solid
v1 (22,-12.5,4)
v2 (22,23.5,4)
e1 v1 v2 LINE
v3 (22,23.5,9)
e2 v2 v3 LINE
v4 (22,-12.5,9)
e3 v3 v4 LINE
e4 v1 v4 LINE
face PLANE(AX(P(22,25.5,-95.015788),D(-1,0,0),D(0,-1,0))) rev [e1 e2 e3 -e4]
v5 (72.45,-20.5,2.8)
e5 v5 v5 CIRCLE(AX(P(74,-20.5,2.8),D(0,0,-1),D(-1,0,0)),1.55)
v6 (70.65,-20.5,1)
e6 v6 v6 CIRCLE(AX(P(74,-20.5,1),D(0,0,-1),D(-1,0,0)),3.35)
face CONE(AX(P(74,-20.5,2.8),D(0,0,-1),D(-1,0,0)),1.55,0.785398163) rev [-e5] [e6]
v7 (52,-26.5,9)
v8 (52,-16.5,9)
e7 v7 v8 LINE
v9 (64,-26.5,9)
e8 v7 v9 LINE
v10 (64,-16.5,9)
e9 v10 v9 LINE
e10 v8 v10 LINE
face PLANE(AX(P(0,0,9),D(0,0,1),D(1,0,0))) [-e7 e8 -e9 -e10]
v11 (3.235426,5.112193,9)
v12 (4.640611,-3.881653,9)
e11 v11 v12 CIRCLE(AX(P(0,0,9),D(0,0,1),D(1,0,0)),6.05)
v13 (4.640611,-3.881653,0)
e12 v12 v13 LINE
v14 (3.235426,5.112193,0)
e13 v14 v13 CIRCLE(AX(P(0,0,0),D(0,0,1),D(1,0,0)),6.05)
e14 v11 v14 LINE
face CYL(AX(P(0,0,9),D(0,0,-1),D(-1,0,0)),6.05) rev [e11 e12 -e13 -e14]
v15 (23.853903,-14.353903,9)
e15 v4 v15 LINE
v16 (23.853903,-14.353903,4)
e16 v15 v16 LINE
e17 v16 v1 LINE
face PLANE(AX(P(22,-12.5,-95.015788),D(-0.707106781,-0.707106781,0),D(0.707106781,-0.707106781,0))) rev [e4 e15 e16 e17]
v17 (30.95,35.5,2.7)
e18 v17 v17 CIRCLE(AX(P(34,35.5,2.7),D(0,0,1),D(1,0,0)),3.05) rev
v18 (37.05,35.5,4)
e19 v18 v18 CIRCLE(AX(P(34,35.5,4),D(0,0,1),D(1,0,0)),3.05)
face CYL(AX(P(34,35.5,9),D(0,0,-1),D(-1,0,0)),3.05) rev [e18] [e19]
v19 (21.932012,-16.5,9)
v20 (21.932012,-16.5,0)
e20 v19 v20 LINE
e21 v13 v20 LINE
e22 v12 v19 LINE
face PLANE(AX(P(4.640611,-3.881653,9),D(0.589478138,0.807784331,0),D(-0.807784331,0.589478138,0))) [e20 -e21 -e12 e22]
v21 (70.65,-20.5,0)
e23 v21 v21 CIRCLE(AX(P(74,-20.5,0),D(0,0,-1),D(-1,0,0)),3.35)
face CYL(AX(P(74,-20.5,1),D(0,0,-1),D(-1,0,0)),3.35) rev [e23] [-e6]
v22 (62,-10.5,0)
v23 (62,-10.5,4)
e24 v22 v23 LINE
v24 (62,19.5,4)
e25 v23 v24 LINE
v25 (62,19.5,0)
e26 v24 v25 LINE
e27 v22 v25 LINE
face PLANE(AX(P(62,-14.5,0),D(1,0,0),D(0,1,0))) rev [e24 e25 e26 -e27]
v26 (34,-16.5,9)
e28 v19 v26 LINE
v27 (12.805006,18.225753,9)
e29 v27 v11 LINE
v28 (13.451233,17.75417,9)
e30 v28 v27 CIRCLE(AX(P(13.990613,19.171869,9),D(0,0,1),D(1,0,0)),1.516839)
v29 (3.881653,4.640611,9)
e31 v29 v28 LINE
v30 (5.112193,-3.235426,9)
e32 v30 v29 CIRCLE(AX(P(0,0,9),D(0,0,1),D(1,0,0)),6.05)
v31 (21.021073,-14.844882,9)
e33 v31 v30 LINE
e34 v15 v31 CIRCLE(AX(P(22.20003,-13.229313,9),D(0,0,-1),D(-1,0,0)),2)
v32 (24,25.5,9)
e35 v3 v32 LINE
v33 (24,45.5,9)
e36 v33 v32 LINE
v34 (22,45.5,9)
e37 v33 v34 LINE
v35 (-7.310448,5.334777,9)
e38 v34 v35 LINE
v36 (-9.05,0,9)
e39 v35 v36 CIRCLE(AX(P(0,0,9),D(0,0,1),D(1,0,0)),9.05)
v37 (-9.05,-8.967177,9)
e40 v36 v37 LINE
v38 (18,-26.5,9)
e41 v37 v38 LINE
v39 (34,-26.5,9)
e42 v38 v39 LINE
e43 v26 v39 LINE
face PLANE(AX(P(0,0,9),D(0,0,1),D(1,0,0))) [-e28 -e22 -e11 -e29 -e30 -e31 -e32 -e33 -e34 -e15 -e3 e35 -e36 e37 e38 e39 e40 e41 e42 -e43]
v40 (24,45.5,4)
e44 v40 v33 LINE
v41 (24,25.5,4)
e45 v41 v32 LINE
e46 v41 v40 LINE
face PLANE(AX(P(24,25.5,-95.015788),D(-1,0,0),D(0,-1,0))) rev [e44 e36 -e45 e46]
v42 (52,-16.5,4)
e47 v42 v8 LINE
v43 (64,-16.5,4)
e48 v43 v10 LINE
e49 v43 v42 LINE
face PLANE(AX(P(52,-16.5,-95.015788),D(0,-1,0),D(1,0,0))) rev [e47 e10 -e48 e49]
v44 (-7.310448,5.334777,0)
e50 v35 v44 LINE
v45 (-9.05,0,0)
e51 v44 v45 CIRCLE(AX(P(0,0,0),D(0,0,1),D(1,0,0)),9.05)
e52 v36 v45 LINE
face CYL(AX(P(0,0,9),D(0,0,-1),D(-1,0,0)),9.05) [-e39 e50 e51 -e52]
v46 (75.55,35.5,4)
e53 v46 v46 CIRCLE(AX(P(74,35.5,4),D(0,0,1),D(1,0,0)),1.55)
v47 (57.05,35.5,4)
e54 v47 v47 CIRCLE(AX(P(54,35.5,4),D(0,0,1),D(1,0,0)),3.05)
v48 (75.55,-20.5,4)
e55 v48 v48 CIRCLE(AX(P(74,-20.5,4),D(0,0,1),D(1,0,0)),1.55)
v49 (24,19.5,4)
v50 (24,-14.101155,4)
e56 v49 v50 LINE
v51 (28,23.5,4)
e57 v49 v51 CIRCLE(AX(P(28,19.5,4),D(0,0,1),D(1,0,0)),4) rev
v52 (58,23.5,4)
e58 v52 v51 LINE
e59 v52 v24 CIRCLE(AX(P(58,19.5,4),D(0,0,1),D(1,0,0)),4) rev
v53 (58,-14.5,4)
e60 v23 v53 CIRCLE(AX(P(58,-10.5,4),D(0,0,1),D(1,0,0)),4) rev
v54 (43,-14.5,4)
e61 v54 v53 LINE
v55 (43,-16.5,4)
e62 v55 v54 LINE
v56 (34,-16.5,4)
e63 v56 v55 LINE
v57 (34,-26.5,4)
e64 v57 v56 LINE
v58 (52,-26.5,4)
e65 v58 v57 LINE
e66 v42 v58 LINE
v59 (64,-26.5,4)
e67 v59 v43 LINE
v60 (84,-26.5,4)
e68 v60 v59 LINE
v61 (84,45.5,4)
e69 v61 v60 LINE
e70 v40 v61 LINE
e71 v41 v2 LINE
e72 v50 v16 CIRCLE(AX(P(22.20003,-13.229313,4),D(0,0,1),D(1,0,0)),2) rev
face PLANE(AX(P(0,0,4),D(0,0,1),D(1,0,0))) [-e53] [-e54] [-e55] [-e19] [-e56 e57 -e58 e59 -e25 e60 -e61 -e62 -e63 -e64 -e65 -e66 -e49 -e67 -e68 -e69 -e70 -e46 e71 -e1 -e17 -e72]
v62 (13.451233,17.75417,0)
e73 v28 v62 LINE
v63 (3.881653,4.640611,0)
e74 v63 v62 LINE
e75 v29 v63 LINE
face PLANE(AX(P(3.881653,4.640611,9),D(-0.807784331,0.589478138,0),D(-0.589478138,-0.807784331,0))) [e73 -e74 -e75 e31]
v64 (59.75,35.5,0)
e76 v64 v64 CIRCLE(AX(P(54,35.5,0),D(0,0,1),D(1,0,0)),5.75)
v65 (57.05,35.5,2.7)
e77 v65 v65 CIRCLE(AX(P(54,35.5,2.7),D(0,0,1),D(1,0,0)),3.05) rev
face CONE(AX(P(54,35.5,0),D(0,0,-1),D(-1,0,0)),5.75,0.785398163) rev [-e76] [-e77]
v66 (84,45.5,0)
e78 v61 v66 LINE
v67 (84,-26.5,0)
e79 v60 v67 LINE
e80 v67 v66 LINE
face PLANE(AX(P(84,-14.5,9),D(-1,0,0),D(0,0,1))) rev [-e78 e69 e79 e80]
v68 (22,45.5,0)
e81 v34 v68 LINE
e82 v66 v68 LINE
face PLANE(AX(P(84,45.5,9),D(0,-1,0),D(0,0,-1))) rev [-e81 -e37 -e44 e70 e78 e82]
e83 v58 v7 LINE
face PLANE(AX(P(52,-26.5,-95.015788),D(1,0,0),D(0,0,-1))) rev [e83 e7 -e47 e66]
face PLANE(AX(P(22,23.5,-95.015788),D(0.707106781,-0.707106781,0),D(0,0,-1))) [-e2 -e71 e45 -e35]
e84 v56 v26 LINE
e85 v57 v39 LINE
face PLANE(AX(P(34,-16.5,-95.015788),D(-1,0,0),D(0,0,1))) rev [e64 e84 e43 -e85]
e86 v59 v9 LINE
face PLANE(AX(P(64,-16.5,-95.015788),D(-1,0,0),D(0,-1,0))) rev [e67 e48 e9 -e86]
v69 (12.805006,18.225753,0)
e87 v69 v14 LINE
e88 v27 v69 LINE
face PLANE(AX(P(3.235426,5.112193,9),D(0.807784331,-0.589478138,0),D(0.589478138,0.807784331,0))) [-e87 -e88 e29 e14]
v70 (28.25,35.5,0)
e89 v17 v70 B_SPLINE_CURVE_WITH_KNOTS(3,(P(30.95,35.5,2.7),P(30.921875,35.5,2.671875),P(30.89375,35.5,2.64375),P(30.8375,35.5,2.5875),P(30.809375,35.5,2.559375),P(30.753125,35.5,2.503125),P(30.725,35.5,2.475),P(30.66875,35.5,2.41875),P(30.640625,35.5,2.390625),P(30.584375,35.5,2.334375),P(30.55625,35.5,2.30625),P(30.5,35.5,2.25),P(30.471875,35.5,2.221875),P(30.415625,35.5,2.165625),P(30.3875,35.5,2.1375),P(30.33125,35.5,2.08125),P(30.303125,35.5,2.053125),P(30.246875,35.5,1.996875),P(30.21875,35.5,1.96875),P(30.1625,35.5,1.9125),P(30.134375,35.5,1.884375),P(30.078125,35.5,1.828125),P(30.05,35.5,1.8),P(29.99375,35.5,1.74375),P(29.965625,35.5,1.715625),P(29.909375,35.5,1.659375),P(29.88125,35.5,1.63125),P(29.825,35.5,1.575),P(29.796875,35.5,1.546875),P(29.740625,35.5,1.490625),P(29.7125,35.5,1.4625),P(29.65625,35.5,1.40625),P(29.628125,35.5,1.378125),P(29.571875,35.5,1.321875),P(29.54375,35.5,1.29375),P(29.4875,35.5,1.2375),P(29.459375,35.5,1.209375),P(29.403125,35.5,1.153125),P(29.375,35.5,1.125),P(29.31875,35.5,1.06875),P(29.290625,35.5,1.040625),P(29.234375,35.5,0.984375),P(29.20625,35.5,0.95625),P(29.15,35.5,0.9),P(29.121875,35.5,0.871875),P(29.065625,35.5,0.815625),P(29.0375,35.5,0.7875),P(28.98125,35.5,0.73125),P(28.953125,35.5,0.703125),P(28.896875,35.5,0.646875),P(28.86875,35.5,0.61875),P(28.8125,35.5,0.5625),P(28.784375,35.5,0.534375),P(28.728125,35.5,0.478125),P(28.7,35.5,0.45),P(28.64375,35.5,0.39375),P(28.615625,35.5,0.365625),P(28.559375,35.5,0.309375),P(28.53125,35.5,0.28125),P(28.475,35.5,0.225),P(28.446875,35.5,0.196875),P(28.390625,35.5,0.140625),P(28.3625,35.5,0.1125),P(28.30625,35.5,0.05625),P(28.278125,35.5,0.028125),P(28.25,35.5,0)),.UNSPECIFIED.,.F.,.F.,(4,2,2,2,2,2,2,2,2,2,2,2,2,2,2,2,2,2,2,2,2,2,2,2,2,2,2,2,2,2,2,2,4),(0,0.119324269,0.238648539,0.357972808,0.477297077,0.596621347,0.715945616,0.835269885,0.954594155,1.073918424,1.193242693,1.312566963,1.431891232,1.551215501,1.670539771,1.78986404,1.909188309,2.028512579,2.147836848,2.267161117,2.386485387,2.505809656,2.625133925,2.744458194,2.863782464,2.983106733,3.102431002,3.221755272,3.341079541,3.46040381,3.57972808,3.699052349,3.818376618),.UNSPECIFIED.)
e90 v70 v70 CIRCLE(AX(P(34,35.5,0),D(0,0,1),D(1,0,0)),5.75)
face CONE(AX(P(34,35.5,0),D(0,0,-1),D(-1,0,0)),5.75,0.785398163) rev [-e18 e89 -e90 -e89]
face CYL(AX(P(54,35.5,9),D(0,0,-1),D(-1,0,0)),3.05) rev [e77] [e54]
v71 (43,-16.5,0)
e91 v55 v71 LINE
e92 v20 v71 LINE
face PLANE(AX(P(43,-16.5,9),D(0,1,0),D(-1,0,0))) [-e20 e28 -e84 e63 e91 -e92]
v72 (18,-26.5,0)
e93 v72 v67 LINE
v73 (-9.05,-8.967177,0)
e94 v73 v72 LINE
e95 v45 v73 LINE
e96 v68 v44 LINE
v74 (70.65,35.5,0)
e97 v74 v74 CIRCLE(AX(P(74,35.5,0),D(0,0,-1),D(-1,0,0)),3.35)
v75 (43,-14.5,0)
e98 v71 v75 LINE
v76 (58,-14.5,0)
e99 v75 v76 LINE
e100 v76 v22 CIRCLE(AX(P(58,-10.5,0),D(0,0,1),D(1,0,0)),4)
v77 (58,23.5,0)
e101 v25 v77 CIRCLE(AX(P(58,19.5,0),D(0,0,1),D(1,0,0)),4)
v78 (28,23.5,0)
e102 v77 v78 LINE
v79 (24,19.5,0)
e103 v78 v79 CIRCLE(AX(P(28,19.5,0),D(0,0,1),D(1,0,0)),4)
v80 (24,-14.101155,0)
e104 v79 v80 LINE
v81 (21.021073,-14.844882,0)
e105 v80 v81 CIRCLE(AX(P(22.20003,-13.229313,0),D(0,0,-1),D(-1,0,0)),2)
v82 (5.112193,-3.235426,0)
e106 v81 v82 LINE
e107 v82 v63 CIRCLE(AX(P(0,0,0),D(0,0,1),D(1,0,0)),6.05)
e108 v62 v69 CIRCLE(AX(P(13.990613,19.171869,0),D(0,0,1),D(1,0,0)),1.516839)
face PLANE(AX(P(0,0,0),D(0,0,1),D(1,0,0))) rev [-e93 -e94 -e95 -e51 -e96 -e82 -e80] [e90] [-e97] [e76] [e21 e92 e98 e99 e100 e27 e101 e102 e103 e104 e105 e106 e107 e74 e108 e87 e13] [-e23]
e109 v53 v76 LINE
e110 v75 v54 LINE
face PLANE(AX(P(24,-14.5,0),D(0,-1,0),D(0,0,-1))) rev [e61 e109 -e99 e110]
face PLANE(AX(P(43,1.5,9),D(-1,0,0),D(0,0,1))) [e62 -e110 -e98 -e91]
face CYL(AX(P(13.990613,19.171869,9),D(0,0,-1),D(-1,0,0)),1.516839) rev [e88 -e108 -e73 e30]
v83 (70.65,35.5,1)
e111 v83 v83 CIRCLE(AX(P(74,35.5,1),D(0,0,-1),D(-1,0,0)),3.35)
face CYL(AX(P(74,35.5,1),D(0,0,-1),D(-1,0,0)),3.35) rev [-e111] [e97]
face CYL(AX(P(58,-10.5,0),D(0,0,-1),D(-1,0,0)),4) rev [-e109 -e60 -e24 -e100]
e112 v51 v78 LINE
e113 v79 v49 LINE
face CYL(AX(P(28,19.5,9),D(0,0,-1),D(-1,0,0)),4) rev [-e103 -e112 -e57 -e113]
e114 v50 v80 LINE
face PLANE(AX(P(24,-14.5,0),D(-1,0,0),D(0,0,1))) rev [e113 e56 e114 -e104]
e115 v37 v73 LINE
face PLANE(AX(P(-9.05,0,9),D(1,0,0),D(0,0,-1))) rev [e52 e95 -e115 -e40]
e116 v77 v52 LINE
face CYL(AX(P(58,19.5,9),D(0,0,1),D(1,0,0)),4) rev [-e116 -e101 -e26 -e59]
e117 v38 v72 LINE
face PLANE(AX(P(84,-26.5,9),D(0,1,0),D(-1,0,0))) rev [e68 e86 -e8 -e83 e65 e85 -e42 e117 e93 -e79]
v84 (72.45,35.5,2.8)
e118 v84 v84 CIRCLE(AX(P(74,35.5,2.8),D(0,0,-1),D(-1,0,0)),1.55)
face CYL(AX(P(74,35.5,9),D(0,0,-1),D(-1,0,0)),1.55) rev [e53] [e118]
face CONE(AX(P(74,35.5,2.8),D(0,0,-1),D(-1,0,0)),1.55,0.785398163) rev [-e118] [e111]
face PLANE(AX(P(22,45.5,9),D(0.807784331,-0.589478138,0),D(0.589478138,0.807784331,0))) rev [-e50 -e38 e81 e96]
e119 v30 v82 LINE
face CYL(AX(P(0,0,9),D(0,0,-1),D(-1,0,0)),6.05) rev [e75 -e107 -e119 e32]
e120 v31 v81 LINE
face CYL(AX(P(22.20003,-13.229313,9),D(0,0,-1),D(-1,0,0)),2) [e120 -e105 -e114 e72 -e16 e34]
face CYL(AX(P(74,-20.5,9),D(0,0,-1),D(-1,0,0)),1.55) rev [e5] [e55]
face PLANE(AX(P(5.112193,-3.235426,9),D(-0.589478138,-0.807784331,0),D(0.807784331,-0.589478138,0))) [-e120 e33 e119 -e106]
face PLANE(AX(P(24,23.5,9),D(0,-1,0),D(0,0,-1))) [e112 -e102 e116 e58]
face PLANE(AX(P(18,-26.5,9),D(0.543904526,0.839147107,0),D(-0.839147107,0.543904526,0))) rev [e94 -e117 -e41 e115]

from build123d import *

# Parameters (mm, degrees)
SKETCH1_R           = 3.05
SKETCH1_R_2         = 1.55
BOSS_EXTRUDE1_DEPTH = 9
CUT_EXTRUDE1_DEPTH  = 5
CHAMFER2_SIZE       = 2.7
SKETCH3_W           = 38
SKETCH3_H           = 38
CUT_EXTRUDE2_DEPTH  = 96.66216598
FILLET1_R           = 4
CHAMFER3_SIZE       = 2
SKETCH4_R           = 3.35
CUT_EXTRUDE3_DEPTH  = 1
CHAMFER4_SIZE       = 1.8


with BuildPart() as part:
    # Sketch1 → Boss-Extrude1 (new body)
    with BuildSketch(Plane.XY):
        with BuildLine():
            Line((84, 45.5), (84, 24))
            Line((84, 24), (84, -14.5))
            Line((84, -14.5), (84, -26.5))
            Line((84, -26.5), (18, -26.5))
            Line((18, -26.5), (-9.05, -8.967177323))
            Line((-9.05, -8.967177323), (-9.05, 0))
            ThreePointArc((-9.05, 0), (-8.604128548, 2.805614358), (-7.310448193, 5.334777148))
            Line((-7.310448193, 5.334777148), (22, 45.5))
            Line((22, 45.5), (84, 45.5))
        make_face()
        with Locations((34, 35.5)):
            Circle(SKETCH1_R, mode=Mode.SUBTRACT)
        with Locations((54, 35.5)):
            Circle(SKETCH1_R, mode=Mode.SUBTRACT)
        with Locations((74, 35.5)):
            Circle(SKETCH1_R_2, mode=Mode.SUBTRACT)
        with Locations((74, -20.5)):
            Circle(SKETCH1_R_2, mode=Mode.SUBTRACT)
        with BuildLine():
            Line((43, 23.5), (43, 7.5))
            ThreePointArc((43, 7.5), (46, 4.5), (43, 1.5))
            Line((43, 1.5), (43, -16.5))
            Line((43, -16.5), (21.932011766, -16.5))
            Line((21.932011766, -16.5), (4.640610801, -3.881653178))
            ThreePointArc((4.640610801, -3.881653178), (-5.977483288, -0.933913025), (3.235425713, 5.112193312))
            Line((3.235425713, 5.112193312), (12.805005626, 18.22575293))
            ThreePointArc((12.805005626, 18.22575293), (14.884756486, 20.397148397), (13.451233091, 17.75417042))
            Line((13.451233091, 17.75417042), (3.881653178, 4.640610801))
            ThreePointArc((3.881653178, 4.640610801), (5.977483288, 0.933913025), (5.112193312, -3.235425713))
            Line((5.112193312, -3.235425713), (21.021073392, -14.84488216))
            ThreePointArc((21.021073392, -14.84488216), (23.110996656, -15.009801956), (24.2, -13.218419945))
            Line((24.2, -13.218419945), (24, 23.5))
            Line((24, 23.5), (43, 23.5))
        make_face(mode=Mode.SUBTRACT)
    extrude(amount=BOSS_EXTRUDE1_DEPTH)

    # Sketch2 → Cut-Extrude1 (cut)
    with BuildSketch(Plane.XY.offset(9)):
        Polygon((24, 25.5), (22, 25.5), (22, -12.5), (26, -16.5), (34, -16.5), (34, -26.5), (52, -26.5), (52, -16.5), (64, -16.5), (64, -26.5), (84, -26.5), (84, 45.5), (24, 45.5), align=None)
    extrude(amount=-CUT_EXTRUDE1_DEPTH, mode=Mode.SUBTRACT)

    # Chamfer2
    chamfer2_edges = [part.edges().sort_by_distance(p)[0] for p in [
        (30.95, 35.5, 0),
        (50.95, 35.5, 0),
    ]]
    chamfer(chamfer2_edges, length=CHAMFER2_SIZE)

    # Sketch3 → Cut-Extrude2 (cut, through all)
    with BuildSketch(Plane.XY.offset(4)):
        with Locations((43, 4.5)):
            Rectangle(SKETCH3_W, SKETCH3_H)
    extrude(amount=-CUT_EXTRUDE2_DEPTH, mode=Mode.SUBTRACT)

    # Fillet1
    fillet1_edges = [part.edges().sort_by_distance(p)[0] for p in [
        (62, 23.5, 2),
        (62, -14.5, 2),
        (24, 23.5, 2),
    ]]
    fillet(fillet1_edges, radius=FILLET1_R)

    # Chamfer3
    chamfer3_edges = [part.edges().sort_by_distance(p)[0] for p in [
        (22, 25.5, 6.5),
    ]]
    chamfer(chamfer3_edges, length=CHAMFER3_SIZE - 0.0001)  # a hair under: the kernel refuses the full size

    # Sketch4 → Cut-Extrude3 (cut)
    with BuildSketch(Plane(origin=(0, 0, 0), x_dir=(-1, 0, 0), z_dir=(0, 0, -1))):
        with Locations((-74, 35.5)):
            Circle(SKETCH4_R)
        with Locations((-74, -20.5)):
            Circle(SKETCH4_R)
    extrude(amount=-CUT_EXTRUDE3_DEPTH, mode=Mode.SUBTRACT)

    # Chamfer4
    chamfer4_edges = [part.edges().sort_by_distance(p)[0] for p in [
        (72.45, 35.5, 1),
        (72.45, -20.5, 1),
    ]]
    chamfer(chamfer4_edges, length=CHAMFER4_SIZE - 0.0001)  # a hair under: the kernel refuses the full size


solid = part.part
